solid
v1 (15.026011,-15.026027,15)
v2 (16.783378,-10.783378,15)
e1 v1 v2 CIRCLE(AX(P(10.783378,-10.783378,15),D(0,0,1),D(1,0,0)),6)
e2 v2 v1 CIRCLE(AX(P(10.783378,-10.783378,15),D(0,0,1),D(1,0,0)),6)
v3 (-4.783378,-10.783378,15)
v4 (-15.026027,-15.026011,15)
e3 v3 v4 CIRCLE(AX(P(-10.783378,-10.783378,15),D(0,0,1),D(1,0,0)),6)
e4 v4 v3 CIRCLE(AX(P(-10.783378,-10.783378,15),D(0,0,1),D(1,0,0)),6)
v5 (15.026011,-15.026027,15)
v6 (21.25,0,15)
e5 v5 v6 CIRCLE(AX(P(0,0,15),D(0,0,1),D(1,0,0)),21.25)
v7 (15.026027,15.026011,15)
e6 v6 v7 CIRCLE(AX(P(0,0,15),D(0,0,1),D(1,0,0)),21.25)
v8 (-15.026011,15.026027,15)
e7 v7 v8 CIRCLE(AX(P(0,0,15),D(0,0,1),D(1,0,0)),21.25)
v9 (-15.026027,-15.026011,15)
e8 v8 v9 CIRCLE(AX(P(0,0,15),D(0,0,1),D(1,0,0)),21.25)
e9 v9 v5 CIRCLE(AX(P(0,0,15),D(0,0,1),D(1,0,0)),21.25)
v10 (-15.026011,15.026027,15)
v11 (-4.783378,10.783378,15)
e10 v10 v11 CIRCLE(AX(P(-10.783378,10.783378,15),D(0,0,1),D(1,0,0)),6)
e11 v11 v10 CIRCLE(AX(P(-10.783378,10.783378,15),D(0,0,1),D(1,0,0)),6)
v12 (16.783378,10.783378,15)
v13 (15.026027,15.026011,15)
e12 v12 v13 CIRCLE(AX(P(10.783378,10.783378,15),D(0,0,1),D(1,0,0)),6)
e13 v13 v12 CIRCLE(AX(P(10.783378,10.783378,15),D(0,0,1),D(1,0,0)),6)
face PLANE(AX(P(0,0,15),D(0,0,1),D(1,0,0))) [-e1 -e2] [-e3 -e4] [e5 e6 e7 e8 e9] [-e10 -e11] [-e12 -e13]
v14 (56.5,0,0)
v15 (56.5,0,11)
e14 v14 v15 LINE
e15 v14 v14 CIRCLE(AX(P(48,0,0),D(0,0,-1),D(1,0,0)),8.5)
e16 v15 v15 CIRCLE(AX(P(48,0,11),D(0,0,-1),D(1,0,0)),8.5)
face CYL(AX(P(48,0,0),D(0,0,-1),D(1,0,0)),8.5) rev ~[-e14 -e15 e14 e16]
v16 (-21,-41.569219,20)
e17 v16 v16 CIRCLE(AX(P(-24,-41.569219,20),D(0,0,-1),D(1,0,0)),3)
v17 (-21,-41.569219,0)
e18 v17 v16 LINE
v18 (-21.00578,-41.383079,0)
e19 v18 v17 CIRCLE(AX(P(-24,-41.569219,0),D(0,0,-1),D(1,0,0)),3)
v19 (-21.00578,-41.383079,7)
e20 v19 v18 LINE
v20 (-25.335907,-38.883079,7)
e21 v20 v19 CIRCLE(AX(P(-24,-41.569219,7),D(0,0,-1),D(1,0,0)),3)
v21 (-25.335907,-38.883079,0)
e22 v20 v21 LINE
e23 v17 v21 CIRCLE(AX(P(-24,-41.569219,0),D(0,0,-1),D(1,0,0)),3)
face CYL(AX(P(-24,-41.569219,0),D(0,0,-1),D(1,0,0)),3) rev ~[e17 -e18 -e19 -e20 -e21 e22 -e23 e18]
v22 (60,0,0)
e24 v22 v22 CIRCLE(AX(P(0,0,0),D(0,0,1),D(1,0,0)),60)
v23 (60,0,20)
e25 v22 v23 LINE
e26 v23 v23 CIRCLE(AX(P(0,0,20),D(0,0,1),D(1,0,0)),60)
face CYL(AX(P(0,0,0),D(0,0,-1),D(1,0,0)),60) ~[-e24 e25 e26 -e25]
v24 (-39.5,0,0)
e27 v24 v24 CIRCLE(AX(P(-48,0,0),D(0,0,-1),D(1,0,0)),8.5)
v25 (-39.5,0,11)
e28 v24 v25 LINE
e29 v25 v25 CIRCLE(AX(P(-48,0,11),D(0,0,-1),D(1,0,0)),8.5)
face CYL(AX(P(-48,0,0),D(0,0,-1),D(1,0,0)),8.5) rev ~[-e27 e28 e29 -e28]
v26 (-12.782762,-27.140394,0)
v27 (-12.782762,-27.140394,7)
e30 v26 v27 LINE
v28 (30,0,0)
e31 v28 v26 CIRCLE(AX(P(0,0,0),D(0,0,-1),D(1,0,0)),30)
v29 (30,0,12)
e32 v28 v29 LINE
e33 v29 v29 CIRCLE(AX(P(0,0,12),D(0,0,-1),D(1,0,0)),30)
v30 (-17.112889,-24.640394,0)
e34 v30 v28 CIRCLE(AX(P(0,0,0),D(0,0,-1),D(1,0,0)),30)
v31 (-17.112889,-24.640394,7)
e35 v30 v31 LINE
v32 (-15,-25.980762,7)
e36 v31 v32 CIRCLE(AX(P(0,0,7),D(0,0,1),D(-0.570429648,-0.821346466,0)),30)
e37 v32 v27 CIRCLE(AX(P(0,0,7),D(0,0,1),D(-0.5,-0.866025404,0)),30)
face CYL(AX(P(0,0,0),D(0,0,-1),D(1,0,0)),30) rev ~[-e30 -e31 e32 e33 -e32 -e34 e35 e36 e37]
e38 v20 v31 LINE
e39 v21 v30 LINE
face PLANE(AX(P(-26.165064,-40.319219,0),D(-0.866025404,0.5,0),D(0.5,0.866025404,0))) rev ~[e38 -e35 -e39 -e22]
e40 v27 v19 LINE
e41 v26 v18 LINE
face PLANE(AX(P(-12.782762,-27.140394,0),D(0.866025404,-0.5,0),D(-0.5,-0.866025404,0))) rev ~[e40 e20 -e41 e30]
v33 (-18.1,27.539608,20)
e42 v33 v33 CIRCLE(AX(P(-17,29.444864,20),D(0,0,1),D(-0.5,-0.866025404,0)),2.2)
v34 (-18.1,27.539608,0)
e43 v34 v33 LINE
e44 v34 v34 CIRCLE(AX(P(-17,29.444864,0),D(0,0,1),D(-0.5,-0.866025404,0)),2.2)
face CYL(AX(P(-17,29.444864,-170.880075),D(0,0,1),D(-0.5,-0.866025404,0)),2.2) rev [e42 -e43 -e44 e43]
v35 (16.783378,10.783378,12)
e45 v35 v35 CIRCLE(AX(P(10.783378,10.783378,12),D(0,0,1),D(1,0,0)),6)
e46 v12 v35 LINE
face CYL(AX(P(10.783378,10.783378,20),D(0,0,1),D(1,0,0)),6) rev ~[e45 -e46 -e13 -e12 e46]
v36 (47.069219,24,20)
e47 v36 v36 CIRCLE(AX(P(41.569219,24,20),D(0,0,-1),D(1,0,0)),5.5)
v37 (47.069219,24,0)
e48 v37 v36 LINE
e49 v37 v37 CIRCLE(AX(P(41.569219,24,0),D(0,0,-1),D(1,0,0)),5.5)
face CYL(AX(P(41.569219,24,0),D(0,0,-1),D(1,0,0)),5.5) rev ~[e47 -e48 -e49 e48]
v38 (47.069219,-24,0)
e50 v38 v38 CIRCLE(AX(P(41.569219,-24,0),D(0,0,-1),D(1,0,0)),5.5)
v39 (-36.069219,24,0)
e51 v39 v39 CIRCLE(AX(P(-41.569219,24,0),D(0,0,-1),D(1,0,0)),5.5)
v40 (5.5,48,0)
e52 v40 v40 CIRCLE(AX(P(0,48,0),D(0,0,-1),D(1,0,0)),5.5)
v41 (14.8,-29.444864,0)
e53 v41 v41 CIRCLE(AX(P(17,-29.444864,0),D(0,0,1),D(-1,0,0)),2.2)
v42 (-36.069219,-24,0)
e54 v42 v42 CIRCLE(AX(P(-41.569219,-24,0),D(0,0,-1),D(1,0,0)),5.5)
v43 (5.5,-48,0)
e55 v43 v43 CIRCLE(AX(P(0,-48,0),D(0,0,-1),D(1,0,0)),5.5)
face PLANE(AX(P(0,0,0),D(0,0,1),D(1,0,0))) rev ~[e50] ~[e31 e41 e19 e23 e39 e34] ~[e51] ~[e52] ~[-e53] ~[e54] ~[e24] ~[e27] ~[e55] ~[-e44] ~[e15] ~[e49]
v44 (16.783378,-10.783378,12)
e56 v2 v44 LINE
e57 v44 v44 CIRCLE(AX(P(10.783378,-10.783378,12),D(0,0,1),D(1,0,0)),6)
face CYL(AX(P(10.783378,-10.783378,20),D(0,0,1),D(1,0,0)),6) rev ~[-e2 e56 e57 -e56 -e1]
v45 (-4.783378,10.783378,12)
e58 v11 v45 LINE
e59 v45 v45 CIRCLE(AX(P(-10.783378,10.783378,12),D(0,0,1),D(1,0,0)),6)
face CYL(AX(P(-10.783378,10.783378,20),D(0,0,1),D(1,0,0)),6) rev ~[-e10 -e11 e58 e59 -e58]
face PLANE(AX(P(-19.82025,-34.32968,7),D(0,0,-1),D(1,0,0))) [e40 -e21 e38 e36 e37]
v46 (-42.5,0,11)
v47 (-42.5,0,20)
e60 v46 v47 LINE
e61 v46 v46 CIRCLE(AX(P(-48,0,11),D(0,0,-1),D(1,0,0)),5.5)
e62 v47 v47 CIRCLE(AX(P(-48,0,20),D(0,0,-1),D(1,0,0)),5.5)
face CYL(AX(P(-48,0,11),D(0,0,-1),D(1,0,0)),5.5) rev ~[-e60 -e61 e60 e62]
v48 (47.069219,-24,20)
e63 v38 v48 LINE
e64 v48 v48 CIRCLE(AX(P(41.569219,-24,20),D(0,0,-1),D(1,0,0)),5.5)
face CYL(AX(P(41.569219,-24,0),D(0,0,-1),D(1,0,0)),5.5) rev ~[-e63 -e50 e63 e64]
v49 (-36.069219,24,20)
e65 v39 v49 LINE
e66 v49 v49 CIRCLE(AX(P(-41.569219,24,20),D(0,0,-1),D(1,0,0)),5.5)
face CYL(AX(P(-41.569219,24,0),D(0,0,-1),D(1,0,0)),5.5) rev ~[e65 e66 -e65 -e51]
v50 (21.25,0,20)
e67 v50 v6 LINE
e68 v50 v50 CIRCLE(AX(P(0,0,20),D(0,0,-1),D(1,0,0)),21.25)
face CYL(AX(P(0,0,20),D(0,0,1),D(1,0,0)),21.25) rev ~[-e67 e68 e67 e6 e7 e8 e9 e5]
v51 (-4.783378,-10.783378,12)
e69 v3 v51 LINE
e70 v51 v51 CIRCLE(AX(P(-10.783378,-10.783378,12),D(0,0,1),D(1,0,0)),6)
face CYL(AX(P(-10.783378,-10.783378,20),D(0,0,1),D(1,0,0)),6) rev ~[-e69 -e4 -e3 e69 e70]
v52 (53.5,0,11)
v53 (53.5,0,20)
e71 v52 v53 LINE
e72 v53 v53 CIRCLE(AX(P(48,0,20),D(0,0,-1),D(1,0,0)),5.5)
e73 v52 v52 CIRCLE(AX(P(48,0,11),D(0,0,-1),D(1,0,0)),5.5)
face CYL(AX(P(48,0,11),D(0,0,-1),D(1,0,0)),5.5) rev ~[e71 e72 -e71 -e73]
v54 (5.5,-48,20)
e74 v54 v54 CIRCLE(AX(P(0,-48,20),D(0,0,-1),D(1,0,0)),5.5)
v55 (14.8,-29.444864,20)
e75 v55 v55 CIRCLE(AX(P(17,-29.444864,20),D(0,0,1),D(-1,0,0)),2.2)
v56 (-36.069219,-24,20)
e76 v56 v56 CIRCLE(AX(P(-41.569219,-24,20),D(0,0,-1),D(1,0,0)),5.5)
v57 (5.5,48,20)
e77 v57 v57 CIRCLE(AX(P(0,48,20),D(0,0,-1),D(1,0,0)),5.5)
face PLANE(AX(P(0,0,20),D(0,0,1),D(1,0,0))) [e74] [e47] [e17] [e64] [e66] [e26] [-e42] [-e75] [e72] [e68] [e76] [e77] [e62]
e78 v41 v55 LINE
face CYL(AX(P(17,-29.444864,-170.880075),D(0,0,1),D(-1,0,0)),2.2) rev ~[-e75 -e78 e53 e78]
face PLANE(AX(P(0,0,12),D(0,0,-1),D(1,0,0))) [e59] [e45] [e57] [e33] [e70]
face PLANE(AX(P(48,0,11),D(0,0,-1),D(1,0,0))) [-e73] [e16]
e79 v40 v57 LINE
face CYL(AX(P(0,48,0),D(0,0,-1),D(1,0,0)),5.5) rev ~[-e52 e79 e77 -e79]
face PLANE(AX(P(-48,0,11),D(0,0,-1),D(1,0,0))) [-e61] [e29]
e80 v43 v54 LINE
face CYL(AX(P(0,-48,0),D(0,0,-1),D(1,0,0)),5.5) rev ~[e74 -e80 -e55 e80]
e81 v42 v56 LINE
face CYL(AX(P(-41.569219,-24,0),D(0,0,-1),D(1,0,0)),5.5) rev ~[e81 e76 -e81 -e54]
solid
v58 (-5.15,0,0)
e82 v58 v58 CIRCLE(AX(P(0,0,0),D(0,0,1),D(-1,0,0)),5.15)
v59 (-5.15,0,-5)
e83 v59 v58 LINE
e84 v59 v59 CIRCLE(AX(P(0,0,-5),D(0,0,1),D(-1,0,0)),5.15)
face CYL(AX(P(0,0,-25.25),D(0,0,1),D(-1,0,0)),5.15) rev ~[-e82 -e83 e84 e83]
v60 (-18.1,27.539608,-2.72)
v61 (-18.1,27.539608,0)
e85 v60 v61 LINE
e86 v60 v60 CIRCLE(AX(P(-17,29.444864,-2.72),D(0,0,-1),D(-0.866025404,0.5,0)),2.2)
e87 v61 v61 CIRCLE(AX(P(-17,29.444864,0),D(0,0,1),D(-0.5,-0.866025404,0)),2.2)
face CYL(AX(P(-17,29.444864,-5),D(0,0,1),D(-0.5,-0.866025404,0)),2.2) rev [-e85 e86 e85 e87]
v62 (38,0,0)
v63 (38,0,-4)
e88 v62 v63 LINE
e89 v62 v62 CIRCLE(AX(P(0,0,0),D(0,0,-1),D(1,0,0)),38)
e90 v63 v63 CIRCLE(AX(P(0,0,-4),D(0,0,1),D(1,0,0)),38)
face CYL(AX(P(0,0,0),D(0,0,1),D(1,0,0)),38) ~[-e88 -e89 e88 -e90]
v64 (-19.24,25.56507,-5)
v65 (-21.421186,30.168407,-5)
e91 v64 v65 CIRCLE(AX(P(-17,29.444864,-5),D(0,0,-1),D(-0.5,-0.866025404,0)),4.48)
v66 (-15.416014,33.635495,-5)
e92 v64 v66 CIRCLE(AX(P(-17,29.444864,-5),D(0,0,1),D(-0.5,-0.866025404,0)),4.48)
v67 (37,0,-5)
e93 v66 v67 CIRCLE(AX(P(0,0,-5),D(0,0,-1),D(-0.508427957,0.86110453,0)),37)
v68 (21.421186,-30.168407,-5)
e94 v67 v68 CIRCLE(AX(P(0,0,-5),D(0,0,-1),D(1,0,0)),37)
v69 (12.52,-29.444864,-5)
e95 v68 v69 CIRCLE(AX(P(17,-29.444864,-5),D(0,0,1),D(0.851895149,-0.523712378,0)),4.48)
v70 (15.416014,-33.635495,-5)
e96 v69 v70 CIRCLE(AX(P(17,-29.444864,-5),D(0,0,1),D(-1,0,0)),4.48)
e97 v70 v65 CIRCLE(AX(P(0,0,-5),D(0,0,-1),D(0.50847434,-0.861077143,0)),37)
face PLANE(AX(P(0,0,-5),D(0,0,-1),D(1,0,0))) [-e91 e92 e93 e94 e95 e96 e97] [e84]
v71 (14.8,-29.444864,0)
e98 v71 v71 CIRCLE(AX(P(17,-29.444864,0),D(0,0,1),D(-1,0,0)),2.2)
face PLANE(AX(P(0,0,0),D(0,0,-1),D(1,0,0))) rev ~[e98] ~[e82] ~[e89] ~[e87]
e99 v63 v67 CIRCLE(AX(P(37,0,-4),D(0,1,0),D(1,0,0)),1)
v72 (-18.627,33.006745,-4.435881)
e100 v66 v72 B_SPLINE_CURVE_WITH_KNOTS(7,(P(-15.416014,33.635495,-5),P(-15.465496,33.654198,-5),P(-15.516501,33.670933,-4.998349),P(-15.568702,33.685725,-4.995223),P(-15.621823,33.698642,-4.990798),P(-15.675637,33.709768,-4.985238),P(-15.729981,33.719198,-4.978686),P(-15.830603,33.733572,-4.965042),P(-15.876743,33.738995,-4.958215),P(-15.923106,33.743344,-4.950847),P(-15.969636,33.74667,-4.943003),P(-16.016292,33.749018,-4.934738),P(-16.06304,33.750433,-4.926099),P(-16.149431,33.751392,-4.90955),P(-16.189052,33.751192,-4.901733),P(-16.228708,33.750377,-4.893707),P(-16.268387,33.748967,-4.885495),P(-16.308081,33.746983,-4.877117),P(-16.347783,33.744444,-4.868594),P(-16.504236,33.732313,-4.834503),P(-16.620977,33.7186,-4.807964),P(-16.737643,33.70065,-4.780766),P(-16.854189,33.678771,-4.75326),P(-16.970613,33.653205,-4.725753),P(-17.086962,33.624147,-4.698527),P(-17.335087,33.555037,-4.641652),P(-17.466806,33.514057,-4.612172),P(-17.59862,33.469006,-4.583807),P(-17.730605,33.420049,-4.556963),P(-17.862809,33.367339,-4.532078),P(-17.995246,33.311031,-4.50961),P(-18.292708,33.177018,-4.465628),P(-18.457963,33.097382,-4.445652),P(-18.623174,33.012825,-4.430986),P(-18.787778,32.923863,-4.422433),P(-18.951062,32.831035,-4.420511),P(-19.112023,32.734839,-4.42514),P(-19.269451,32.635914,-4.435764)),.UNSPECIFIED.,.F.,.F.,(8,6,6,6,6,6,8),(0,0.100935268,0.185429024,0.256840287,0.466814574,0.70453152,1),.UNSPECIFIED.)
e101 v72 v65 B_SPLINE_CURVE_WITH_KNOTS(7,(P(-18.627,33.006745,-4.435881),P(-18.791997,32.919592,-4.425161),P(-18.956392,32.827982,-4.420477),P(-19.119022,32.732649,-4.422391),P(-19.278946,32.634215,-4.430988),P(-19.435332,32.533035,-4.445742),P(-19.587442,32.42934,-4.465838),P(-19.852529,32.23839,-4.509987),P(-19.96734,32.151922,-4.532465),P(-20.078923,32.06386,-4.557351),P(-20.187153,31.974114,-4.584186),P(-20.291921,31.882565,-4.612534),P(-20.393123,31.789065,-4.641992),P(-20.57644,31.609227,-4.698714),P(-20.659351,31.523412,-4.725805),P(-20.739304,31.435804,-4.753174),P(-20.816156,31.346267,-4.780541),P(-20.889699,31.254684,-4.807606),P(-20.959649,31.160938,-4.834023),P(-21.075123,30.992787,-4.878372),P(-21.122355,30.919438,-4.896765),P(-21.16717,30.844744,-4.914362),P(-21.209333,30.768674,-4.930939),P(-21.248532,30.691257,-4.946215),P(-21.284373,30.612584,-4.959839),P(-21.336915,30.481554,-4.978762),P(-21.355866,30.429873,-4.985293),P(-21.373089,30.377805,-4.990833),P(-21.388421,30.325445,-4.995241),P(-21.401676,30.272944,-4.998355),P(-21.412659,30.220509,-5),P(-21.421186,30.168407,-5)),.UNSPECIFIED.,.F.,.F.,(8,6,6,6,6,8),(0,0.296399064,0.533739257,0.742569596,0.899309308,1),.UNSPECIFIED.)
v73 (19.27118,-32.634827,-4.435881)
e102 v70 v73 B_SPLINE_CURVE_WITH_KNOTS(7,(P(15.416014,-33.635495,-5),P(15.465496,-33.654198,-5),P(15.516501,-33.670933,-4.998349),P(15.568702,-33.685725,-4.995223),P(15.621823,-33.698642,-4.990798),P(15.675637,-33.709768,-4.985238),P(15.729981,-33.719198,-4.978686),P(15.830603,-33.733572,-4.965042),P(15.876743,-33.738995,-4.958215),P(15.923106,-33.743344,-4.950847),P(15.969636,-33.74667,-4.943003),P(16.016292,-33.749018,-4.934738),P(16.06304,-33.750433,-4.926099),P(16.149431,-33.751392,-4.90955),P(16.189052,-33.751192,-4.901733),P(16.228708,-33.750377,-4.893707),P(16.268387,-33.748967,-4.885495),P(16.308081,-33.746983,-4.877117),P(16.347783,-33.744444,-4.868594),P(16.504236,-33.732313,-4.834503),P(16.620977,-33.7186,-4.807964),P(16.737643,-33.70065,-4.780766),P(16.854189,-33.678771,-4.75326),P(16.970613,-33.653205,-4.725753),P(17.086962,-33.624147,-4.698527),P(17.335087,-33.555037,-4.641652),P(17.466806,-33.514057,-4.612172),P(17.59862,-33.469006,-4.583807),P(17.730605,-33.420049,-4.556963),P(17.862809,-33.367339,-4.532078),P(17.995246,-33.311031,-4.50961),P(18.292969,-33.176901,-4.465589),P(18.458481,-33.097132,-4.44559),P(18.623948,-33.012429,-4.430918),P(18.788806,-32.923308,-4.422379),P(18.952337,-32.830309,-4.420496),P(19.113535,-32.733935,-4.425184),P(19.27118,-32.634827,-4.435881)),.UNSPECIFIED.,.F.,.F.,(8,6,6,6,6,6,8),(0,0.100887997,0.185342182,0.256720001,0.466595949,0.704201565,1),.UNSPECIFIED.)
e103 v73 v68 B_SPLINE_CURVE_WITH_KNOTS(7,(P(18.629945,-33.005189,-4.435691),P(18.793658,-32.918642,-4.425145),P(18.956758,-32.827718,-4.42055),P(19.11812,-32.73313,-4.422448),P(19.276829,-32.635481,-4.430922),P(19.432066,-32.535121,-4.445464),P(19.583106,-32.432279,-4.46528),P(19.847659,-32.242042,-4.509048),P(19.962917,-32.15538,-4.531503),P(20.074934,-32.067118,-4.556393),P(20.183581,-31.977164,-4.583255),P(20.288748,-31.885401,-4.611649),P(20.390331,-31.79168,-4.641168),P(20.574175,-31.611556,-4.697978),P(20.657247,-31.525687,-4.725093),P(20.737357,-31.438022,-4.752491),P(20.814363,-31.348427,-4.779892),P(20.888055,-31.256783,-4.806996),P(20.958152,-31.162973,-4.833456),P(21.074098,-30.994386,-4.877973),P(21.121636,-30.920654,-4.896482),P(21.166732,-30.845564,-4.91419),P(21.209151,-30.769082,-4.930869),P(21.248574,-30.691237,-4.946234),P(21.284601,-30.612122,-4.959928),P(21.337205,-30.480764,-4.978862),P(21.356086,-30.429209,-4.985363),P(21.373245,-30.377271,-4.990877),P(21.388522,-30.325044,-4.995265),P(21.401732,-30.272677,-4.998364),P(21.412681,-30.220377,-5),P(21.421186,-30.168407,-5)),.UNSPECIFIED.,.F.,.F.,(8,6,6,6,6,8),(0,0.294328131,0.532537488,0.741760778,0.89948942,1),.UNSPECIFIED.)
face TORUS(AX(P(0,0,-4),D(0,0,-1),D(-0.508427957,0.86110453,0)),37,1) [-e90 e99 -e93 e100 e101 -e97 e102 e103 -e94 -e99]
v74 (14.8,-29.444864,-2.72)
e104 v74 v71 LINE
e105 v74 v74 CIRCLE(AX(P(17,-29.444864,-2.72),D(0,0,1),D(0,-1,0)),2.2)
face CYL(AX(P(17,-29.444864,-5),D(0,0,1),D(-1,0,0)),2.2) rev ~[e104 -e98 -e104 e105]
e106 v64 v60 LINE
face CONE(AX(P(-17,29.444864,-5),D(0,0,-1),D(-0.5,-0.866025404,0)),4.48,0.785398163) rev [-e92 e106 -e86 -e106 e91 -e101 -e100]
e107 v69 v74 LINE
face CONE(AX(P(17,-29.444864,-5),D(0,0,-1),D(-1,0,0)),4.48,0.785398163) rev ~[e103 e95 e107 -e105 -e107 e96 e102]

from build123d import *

# Parameters (mm, degrees)
F0_R            = 60
F1_DEPTH        = 20
F2_R            = 21.25
F3_DEPTH        = 5
F4_R            = 6
F5_DEPTH        = 20.001
F6_R            = 30
F7_DEPTH        = 12
F8_R            = 8.5
F9_DEPTH        = 11
F10_R           = 5.5
F11_DEPTH       = 9.001
F12_R           = 5.5
F13_DEPTH       = 20.001
F15_D           = 4.4
F16_R           = 38
F17_DEPTH       = 5
F19_D           = 4.4
F19_CSINK_D     = 8.96
F19_CSINK_ANGLE = 90
F20_T2_ANGLE    = 181.12451927
F20_T4_ANGLE    = 120.559173381
F20_T6_ANGLE    = 60.5572258986
F22_D           = 10.3
F22_DEPTH       = 20.25
F22_TIP         = 3.094432188
F23_R           = 3
F24_DEPTH       = 25
F26_DEPTH       = 7


# Not quite as in the source:
# - a fillet or chamfer that OpenCascade refuses, or shapes differently, is made with other operations: its cross-section is extruded or revolved along the edge and cut away or added
# - a pattern or mirror of a feature is missing from the dataset's text; its kind, count and spacing are read off the source's solid


with BuildPart() as f1:
    # F0 (on Top) → F1 (new body)
    with BuildSketch(Plane.XY):
        Circle(F0_R)
    extrude(amount=F1_DEPTH)

    # F2 (on face) → F3 (cut)
    with BuildSketch(Plane.XY.offset(20)):
        Circle(F2_R)
    extrude(amount=-F3_DEPTH, mode=Mode.SUBTRACT)

    # F4 (on face) → F5 (cut, through all)
    with BuildSketch(Plane.XY.offset(20)):
        with Locations((10.7833784131, 10.7833784131)):
            Circle(F4_R)
        with Locations((-10.7833784131, 10.7833784131)):
            Circle(F4_R)
        with Locations((-10.7833784131, -10.7833784131)):
            Circle(F4_R)
        with Locations((10.7833784131, -10.7833784131)):
            Circle(F4_R)
    extrude(amount=-F5_DEPTH, mode=Mode.SUBTRACT)

    # F6 (on face) → F7 (cut)
    with BuildSketch(Plane(origin=(0, 0, 0), x_dir=(1, 0, 0), z_dir=(0, 0, -1))):
        Circle(F6_R)
    extrude(amount=-F7_DEPTH, mode=Mode.SUBTRACT)

    # F8 (on face) → F9 (cut)
    with BuildSketch(Plane(origin=(0, 0, 0), x_dir=(1, 0, 0), z_dir=(0, 0, -1))):
        with Locations((-48, 0)):
            Circle(F8_R)
        with Locations((48, 0)):
            Circle(F8_R)
    extrude(amount=-F9_DEPTH, mode=Mode.SUBTRACT)

    # F10 (on face) → F11 (cut, through all)
    with BuildSketch(Plane(origin=(0, 0, 11), x_dir=(1, 0, 0), z_dir=(0, 0, -1))):
        with Locations((-48, 0)):
            Circle(F10_R)
        with Locations((48, 0)):
            Circle(F10_R)
    extrude(amount=-F11_DEPTH, mode=Mode.SUBTRACT)

    # F12 (on face) → F13 (cut, through all)
    with BuildSketch(Plane(origin=(0, 0, 0), x_dir=(1, 0, 0), z_dir=(0, 0, -1))):
        with Locations((41.5692193817, 24)):
            Circle(F12_R)
        with Locations((0, 48)):
            Circle(F12_R)
        with Locations((-41.5692193817, 24)):
            Circle(F12_R)
        with Locations((-41.5692193817, -24)):
            Circle(F12_R)
        with Locations((0, -48)):
            Circle(F12_R)
        with Locations((41.5692193817, -24)):
            Circle(F12_R)
    extrude(amount=-F13_DEPTH, mode=Mode.SUBTRACT)

    # F15 (through all)
    with Locations(Plane(origin=(0, 0, 0), x_dir=(1, 0, 0), z_dir=(0, 0, -1))):
        with Locations((17, 29.4448637287)):
            f15 = Hole(F15_D / 2)

    # F15_copies: F15 across plane
    add(f15.mirror(Plane(origin=(0, 0, 0), x_dir=(0.8660254038, 0.5, 0), z_dir=(-0.5, 0.8660254038, 0))), mode=Mode.SUBTRACT)

    # F23 (on face) → F24 (cut)
    with BuildSketch(Plane(origin=(0, 0, 0), x_dir=(1, 0, 0), z_dir=(0, 0, -1))):
        with Locations((-24, 41.5692193817)):
            Circle(F23_R)
    extrude(amount=-F24_DEPTH, mode=Mode.SUBTRACT)

    # F25 (on face) → F26 (cut)
    with BuildSketch(Plane(origin=(0, 0, 0), x_dir=(1, 0, 0), z_dir=(0, 0, -1))):
        with BuildLine():
            ThreePointArc((-21.8349364905, 42.8192193817), (-25.25, 43.7342828911), (-26.1650635095, 40.3192193817))
            Line((-26.1650635095, 40.3192193817), (-17.1128894383, 24.6403939715))
            ThreePointArc((-17.1128894383, 24.6403939715), (-16.0704251253, 25.332616057), (-15, 25.9807621135))
            ThreePointArc((-15, 25.9807621135), (-13.903476487, 26.5837044366), (-12.7827624194, 27.1403939715))
            Line((-12.7827624194, 27.1403939715), (-21.8349364905, 42.8192193817))
        make_face()
    extrude(amount=-F26_DEPTH, mode=Mode.SUBTRACT)


with BuildPart() as f17:
    # F16 (on face) → F17 (new body)
    with BuildSketch(Plane(origin=(0, 0, 0), x_dir=(1, 0, 0), z_dir=(0, 0, -1))):
        Circle(F16_R)
    extrude(amount=F17_DEPTH)

    # F19 (through all)
    with Locations(Plane(origin=(0, 0, -5), x_dir=(1, 0, 0), z_dir=(0, 0, -1))):
        with Locations((17, 29.4448637287)):
            f19 = CounterSinkHole(F19_D / 2, F19_CSINK_D / 2, counter_sink_angle=F19_CSINK_ANGLE)

    # F19_copies: F19 across plane
    add(f19.mirror(Plane(origin=(0, 0, 0), x_dir=(0.8660254038, 0.5, 0), z_dir=(-0.5, 0.8660254038, 0))), mode=Mode.SUBTRACT)

    # F20: fillet of radius 1 on 3 edges, made by hand

    # F20_s1 → F20_t2 (revolve, cut)
    with BuildSketch(Plane(origin=(0, 0, 0), x_dir=(0, 0, 1), z_dir=(0.8610771426, 0.5084743401, 0))):
        with BuildLine():
            ThreePointArc((-4, 38), (-4.7071067812, 37.7071067812), (-5, 37))
            Line((-5, 37), (-5, 38))
            Line((-5, 38), (-4, 38))
        make_face()
    revolve(axis=Axis((0, 0, -5), (0, 0, -1)), revolution_arc=F20_T2_ANGLE, mode=Mode.SUBTRACT)

    # F20_s3 → F20_t4 (revolve, cut)
    with BuildSketch(Plane(origin=(0, 0, 0), x_dir=(0, 0, 1), z_dir=(-0.8611045305, -0.5084279572, 0))):
        with BuildLine():
            ThreePointArc((-4, 38), (-4.7071067812, 37.7071067812), (-5, 37))
            Line((-5, 37), (-5, 38))
            Line((-5, 38), (-4, 38))
        make_face()
    revolve(axis=Axis((0, 0, -5), (0, 0, -1)), revolution_arc=F20_T4_ANGLE, mode=Mode.SUBTRACT)

    # F20_s5 → F20_t6 (revolve, cut)
    with BuildSketch(Plane.XZ):
        with BuildLine():
            ThreePointArc((38, -4), (37.7071067812, -4.7071067812), (37, -5))
            Line((37, -5), (38, -5))
            Line((38, -5), (38, -4))
        make_face()
    revolve(axis=Axis((0, 0, -5), (0, 0, -1)), revolution_arc=F20_T6_ANGLE, mode=Mode.SUBTRACT)

    # F22
    with Locations(Plane(origin=(0, 0, -5), x_dir=(1, 0, 0), z_dir=(0, 0, -1))):
        with Locations((0, 0)):
            Hole(F22_D / 2, depth=F22_DEPTH)
            with Locations((0, 0, -(F22_DEPTH + F22_TIP / 2))):  # 118° drill point
                Cone(0, F22_D / 2, F22_TIP, mode=Mode.SUBTRACT)


solid = Compound([f1.part, f17.part])
